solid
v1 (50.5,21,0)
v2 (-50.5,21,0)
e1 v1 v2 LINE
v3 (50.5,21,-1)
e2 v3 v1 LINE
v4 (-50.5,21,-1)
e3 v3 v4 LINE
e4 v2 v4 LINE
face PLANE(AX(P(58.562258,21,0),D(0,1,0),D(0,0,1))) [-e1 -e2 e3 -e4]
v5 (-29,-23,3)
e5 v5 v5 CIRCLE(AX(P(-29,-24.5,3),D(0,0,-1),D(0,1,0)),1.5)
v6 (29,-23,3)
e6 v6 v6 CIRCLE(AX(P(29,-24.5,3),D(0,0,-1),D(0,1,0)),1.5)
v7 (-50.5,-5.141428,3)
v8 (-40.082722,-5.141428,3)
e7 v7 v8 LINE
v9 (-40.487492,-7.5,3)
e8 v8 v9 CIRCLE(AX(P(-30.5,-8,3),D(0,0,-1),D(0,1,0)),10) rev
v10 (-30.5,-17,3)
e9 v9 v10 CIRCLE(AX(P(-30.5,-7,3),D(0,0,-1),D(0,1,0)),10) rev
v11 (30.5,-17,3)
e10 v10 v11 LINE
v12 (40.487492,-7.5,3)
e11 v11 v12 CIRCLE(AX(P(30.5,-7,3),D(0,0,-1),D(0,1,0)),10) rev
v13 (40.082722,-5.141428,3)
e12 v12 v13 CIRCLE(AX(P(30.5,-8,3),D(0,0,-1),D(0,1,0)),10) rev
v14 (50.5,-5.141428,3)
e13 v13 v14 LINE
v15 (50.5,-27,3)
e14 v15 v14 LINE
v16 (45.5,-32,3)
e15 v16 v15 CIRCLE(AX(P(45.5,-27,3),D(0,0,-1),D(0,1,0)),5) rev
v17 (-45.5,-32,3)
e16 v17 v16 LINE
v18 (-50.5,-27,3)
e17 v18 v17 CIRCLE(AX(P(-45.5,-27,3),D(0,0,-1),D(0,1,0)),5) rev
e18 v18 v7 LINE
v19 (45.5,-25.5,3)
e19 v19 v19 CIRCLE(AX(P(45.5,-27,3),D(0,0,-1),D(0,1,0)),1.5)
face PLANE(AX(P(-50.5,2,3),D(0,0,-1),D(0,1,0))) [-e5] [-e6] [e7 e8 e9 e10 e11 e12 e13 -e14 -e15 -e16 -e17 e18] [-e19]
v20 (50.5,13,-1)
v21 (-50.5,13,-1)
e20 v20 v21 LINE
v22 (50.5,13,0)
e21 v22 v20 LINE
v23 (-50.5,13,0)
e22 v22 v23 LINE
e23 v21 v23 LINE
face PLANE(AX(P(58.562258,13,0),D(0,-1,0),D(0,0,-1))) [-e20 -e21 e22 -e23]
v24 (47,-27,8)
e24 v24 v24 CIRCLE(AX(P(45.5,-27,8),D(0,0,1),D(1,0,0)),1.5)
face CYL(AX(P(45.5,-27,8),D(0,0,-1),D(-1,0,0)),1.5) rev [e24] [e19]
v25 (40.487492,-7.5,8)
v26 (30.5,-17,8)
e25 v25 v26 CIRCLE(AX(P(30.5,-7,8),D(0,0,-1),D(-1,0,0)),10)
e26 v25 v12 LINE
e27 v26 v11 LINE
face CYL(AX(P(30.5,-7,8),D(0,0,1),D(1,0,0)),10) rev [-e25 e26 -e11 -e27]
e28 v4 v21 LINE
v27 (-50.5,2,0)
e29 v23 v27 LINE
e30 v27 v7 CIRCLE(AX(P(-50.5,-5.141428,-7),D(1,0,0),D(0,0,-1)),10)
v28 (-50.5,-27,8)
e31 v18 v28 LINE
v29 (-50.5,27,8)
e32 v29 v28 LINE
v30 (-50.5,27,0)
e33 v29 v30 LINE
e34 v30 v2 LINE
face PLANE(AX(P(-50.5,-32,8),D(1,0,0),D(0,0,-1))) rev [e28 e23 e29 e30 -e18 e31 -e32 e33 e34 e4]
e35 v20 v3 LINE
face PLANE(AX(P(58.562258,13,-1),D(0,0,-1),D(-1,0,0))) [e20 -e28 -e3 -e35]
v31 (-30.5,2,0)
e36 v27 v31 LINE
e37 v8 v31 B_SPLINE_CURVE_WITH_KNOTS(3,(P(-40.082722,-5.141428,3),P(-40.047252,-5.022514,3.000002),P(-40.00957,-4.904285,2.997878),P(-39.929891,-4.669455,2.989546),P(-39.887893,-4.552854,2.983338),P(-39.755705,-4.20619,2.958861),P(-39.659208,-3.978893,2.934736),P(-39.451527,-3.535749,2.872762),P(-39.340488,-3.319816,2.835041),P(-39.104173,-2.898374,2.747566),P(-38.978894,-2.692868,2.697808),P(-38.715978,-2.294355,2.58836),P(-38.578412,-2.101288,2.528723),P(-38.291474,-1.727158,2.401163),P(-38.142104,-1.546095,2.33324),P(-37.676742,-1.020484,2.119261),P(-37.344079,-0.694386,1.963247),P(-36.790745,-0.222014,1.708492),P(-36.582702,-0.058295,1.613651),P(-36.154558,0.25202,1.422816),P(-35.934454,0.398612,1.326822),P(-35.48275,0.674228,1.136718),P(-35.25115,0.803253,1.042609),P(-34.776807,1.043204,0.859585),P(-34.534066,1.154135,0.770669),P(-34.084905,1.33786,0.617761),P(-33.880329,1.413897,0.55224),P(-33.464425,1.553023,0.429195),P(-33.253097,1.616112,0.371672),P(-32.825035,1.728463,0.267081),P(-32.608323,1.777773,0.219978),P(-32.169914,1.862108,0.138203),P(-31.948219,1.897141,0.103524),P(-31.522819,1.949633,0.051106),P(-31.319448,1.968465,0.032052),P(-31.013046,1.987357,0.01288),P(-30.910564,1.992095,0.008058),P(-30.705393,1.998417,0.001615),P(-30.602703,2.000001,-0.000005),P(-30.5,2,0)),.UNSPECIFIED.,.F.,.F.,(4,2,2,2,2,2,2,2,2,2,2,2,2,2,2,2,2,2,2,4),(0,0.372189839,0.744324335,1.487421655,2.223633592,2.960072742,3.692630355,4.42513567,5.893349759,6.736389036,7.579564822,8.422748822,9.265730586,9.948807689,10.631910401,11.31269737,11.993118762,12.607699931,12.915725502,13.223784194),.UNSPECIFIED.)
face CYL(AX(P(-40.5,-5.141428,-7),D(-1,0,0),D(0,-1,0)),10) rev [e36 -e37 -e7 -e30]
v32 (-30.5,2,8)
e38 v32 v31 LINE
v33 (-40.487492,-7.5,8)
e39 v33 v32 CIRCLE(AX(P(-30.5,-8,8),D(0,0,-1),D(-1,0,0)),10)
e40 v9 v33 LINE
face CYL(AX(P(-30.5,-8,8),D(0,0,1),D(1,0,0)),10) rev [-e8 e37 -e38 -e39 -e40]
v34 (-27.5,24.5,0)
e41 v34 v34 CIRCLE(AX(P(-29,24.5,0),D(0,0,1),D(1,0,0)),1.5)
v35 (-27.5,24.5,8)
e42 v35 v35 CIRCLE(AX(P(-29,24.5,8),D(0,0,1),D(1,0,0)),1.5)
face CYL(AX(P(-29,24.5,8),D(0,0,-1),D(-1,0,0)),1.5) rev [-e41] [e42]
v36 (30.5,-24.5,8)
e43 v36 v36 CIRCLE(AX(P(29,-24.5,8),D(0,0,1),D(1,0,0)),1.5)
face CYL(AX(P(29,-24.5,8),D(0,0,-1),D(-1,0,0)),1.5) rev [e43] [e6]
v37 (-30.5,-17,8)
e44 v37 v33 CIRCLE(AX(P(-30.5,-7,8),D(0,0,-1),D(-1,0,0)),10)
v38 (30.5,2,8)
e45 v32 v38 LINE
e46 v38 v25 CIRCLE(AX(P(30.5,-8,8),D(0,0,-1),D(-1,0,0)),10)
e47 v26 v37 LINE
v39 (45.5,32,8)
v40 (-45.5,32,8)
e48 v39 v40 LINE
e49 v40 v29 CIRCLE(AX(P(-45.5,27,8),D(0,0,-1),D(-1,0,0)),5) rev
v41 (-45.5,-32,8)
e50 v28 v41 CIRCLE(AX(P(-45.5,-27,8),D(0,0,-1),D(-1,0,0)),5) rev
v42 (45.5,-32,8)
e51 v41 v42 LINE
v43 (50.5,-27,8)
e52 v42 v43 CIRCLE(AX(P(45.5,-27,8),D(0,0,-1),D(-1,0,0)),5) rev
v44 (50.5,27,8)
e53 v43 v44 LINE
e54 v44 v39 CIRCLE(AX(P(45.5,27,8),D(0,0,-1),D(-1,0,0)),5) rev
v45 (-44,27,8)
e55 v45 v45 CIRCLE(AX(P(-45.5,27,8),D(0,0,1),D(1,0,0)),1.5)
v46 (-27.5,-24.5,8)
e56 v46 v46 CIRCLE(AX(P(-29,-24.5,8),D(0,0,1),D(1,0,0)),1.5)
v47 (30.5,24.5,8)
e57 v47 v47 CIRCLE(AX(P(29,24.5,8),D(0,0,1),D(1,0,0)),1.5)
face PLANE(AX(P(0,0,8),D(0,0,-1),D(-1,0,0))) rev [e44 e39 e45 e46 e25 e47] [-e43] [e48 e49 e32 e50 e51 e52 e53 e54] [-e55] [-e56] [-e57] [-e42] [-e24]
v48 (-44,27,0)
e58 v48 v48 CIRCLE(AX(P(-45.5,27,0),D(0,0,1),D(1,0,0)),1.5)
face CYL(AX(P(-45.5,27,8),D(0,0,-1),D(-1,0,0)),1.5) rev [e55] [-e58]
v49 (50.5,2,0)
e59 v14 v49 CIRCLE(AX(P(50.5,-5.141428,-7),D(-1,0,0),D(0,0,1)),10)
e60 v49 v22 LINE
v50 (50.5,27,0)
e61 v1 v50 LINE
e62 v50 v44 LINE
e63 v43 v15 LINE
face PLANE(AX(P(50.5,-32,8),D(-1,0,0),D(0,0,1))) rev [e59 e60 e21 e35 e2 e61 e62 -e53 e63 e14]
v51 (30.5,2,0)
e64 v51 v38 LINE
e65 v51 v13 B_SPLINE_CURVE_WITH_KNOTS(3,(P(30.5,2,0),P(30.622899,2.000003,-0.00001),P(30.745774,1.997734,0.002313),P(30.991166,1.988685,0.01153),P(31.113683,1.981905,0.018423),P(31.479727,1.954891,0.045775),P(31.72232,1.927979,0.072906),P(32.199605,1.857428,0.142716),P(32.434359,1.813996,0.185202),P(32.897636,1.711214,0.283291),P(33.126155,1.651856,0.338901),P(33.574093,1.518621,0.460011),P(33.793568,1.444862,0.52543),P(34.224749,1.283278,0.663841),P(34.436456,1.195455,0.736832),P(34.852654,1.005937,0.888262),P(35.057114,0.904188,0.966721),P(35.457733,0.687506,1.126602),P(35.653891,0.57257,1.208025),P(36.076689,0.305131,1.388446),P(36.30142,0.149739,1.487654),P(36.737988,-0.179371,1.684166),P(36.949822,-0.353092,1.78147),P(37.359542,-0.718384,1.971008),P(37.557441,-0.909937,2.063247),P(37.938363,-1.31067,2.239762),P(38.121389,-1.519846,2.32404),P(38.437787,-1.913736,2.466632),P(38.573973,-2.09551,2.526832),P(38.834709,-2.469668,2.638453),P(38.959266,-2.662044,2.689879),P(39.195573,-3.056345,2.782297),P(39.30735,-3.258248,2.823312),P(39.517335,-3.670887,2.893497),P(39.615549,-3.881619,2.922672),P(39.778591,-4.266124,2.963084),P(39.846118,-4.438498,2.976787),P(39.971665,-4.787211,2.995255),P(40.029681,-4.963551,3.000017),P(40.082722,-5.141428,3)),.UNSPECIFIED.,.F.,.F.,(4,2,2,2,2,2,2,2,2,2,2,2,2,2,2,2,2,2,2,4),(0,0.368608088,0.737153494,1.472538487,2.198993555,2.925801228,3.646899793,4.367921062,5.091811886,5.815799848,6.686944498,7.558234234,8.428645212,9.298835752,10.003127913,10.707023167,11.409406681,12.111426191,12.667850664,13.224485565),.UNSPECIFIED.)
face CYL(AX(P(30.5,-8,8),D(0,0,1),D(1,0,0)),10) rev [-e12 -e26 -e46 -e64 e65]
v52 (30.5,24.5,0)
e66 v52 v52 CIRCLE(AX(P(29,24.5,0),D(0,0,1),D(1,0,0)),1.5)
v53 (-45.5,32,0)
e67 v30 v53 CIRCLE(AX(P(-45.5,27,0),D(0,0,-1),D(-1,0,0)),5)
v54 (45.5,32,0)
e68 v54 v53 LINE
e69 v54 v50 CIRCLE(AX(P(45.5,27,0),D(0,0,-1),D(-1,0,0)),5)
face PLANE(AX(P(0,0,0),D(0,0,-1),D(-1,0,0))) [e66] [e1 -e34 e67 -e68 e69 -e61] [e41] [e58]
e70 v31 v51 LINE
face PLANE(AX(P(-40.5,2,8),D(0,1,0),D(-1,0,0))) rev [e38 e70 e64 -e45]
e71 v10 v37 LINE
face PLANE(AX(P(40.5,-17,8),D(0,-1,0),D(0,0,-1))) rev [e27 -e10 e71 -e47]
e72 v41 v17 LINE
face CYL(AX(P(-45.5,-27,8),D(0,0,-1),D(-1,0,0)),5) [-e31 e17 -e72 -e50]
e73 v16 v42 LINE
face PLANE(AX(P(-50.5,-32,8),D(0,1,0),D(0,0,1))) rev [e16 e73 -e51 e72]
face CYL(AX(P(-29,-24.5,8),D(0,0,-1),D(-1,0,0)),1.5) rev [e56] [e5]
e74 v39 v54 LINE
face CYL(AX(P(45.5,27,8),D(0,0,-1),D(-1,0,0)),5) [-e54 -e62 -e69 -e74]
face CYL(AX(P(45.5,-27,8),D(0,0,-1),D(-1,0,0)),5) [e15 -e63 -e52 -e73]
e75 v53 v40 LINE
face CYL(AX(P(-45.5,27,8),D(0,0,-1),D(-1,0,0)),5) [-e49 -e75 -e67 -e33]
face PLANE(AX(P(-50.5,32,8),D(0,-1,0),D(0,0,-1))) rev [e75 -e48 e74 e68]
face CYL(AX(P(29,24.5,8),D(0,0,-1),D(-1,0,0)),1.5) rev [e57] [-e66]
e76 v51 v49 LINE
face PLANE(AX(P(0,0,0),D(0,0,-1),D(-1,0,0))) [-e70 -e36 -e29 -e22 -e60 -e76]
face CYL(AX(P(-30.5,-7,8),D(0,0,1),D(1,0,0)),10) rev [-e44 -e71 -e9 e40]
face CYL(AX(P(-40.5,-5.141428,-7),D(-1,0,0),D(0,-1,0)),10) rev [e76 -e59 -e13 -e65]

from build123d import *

# Parameters (mm, degrees)
SKETCH1_W           = 101
SKETCH1_H           = 64
SKETCH1_R           = 1.5
BOSS_EXTRUDE1_DEPTH = 8
SKETCH2_W           = 8
SKETCH2_H           = 1
BOSS_EXTRUDE2_DEPTH = 101
FILLET1_R           = 5
SKETCH3_W           = 81
SKETCH3_H           = 19
CUT_EXTRUDE1_DEPTH  = 61.317907789
FILLET2_R           = 10
SKETCH4_W           = 34
SKETCH4_H           = 3
CUT_EXTRUDE2_DEPTH  = 114.204461043
FILLET3_START       = 39.83238
FILLET3_DEPTH       = 10.66762
FILLET3_START_2     = -50.5
FILLET3_2_DEPTH     = 10.012507722
FILLET3_START_3     = -40.487492278
FILLET3_3_DEPTH     = 9.987492378
FILLET3_START_4     = 30.4999999
FILLET3_4_DEPTH     = 9.3323801
FILLET3_START_5     = -1
FILLET3_5_DEPTH     = 4


with BuildPart() as part:
    # Sketch1 → Boss-Extrude1 (new body)
    with BuildSketch(Plane.XY):
        Rectangle(SKETCH1_W, SKETCH1_H)
        with Locations((-29, 24.5)):
            Circle(SKETCH1_R, mode=Mode.SUBTRACT)
        with Locations((29, 24.5)):
            Circle(SKETCH1_R, mode=Mode.SUBTRACT)
        with Locations((29, -24.5)):
            Circle(SKETCH1_R, mode=Mode.SUBTRACT)
        with Locations((-29, -24.5)):
            Circle(SKETCH1_R, mode=Mode.SUBTRACT)
        with Locations((45.5, -27)):
            Circle(SKETCH1_R, mode=Mode.SUBTRACT)
        with Locations((-45.5, 27)):
            Circle(SKETCH1_R, mode=Mode.SUBTRACT)
    extrude(amount=BOSS_EXTRUDE1_DEPTH)

    # Sketch2 → Boss-Extrude2 (add)
    with BuildSketch(Plane(origin=(-50.5, -4.5, 0), x_dir=(0, 1, 0), z_dir=(-1, 0, 0))):
        with Locations((21.5, 0.5)):
            Rectangle(SKETCH2_W, SKETCH2_H)
    extrude(amount=-BOSS_EXTRUDE2_DEPTH)

    # Fillet1
    fillet1_edges = [part.edges().sort_by_distance(p)[0] for p in [
        (50.5, -32, 4),
        (-50.5, -32, 4),
        (-50.5, 32, 4),
        (50.5, 32, 4),
    ]]
    fillet(fillet1_edges, radius=FILLET1_R)

    # Sketch3 → Cut-Extrude1 (cut, through all)
    with BuildSketch(Plane(origin=(0, 0, 0), x_dir=(-1, 0, 0), z_dir=(0, 0, -1))):
        with Locations((0, -7.5)):
            Rectangle(SKETCH3_W, SKETCH3_H)
    extrude(amount=-CUT_EXTRUDE1_DEPTH, mode=Mode.SUBTRACT)

    # Fillet2
    # the kernel refuses this fillet: 10 mm, written as the material it adds along each edge
    with BuildSketch(Plane(origin=(40.5, -17, 0), x_dir=(-1, 0, 0), z_dir=(0, 0, 1)), Plane(origin=(-40.5, -17, 0), x_dir=(0, 1, 0), z_dir=(0, 0, 1)), Plane(origin=(40.5, 2, 0), x_dir=(0, -1, 0), z_dir=(0, 0, 1))) as fillet2_piece_1:
        with BuildLine():
            CenterArc((FILLET2_R, -FILLET2_R), FILLET2_R, 90, 90)
            Line((0, -FILLET2_R), (0, 0))
            Line((0, 0), (FILLET2_R, 0))
        make_face()
    extrude(amount=8)
    with BuildSketch(Plane(origin=(-40.5, 2, 0), x_dir=(0, -1, 0), z_dir=(0, 0, 1))) as fillet2_piece_2:
        with BuildLine():
            CenterArc((FILLET2_R, FILLET2_R), FILLET2_R, 180, 90)
            Line((0, FILLET2_R), (0, 0))
            Line((0, 0), (FILLET2_R, 0))
        make_face()
    extrude(amount=8)

    # Sketch4 → Cut-Extrude2 (cut, through all)
    with BuildSketch(Plane(origin=(50.5, -18.5, 0), x_dir=(0, 1, 0), z_dir=(-1, 0, 0))):
        with Locations((3.5, -1.5)):
            Rectangle(SKETCH4_W, SKETCH4_H)
    extrude(amount=CUT_EXTRUDE2_DEPTH, mode=Mode.SUBTRACT)

    # Fillet3: read off the stored shape, not the designer's step
    # Fillet3 outline → Fillet3 (add)
    with BuildSketch(Plane.YZ.offset(FILLET3_START)):
        with BuildLine():
            Line((2, 3), (-5.141428429, 3))
            ThreePointArc((-5.141428429, 3), (-1.268444058, 2.219544027), (2.000001555, -1.587e-06))
            Line((2.000001555, -1.587e-06), (2, 3))
        make_face()
    extrude(amount=FILLET3_DEPTH)

    # Fillet3 2 outline → Fillet3 2 (add)
    with BuildSketch(Plane.YZ.offset(FILLET3_START_2)):
        with BuildLine():
            Line((2, 3), (-5.141428429, 3))
            ThreePointArc((-5.141428429, 3), (-1.268444058, 2.219544027), (2.000001555, -1.587e-06))
            Line((2.000001555, -1.587e-06), (2, 3))
        make_face()
    extrude(amount=FILLET3_2_DEPTH)

    # Fillet3 3 outline → Fillet3 3 (add)
    with BuildSketch(Plane.YZ.offset(FILLET3_START_3)):
        with BuildLine():
            Line((2, 3), (-5.141428429, 3))
            ThreePointArc((-5.141428429, 3), (-1.268444058, 2.219544027), (2.000001555, -1.587e-06))
            Line((2.000001555, -1.587e-06), (2, 3))
        make_face()
    extrude(amount=FILLET3_3_DEPTH)

    # Fillet3 4 outline → Fillet3 4 (add)
    with BuildSketch(Plane.YZ.offset(FILLET3_START_4)):
        with BuildLine():
            Line((2, 3), (-5.141428429, 3))
            ThreePointArc((-5.141428429, 3), (-1.268444058, 2.219544027), (2.000001555, -1.587e-06))
            Line((2.000001555, -1.587e-06), (2, 3))
        make_face()
    extrude(amount=FILLET3_4_DEPTH)

    # Fillet3 5 outline → Fillet3 5 (cut)
    with BuildSketch(Plane.XY.offset(FILLET3_START_5)):
        with BuildLine():
            Line((30.4999999, -7), (40.449874371, -7))
            ThreePointArc((40.449874371, -7), (37.208203932, -0.583801513), (30.5, 2))
            Line((30.5, 2), (30.4999999, -7))
        make_face()
        with BuildLine():
            Line((-40.449874371, -7), (-30.4999999, -7))
            Line((-30.4999999, -7), (-30.5, 2))
            ThreePointArc((-30.5, 2), (-37.208203932, -0.583801513), (-40.449874371, -7))
        make_face()
    extrude(amount=FILLET3_5_DEPTH, mode=Mode.SUBTRACT)


solid = part.part
